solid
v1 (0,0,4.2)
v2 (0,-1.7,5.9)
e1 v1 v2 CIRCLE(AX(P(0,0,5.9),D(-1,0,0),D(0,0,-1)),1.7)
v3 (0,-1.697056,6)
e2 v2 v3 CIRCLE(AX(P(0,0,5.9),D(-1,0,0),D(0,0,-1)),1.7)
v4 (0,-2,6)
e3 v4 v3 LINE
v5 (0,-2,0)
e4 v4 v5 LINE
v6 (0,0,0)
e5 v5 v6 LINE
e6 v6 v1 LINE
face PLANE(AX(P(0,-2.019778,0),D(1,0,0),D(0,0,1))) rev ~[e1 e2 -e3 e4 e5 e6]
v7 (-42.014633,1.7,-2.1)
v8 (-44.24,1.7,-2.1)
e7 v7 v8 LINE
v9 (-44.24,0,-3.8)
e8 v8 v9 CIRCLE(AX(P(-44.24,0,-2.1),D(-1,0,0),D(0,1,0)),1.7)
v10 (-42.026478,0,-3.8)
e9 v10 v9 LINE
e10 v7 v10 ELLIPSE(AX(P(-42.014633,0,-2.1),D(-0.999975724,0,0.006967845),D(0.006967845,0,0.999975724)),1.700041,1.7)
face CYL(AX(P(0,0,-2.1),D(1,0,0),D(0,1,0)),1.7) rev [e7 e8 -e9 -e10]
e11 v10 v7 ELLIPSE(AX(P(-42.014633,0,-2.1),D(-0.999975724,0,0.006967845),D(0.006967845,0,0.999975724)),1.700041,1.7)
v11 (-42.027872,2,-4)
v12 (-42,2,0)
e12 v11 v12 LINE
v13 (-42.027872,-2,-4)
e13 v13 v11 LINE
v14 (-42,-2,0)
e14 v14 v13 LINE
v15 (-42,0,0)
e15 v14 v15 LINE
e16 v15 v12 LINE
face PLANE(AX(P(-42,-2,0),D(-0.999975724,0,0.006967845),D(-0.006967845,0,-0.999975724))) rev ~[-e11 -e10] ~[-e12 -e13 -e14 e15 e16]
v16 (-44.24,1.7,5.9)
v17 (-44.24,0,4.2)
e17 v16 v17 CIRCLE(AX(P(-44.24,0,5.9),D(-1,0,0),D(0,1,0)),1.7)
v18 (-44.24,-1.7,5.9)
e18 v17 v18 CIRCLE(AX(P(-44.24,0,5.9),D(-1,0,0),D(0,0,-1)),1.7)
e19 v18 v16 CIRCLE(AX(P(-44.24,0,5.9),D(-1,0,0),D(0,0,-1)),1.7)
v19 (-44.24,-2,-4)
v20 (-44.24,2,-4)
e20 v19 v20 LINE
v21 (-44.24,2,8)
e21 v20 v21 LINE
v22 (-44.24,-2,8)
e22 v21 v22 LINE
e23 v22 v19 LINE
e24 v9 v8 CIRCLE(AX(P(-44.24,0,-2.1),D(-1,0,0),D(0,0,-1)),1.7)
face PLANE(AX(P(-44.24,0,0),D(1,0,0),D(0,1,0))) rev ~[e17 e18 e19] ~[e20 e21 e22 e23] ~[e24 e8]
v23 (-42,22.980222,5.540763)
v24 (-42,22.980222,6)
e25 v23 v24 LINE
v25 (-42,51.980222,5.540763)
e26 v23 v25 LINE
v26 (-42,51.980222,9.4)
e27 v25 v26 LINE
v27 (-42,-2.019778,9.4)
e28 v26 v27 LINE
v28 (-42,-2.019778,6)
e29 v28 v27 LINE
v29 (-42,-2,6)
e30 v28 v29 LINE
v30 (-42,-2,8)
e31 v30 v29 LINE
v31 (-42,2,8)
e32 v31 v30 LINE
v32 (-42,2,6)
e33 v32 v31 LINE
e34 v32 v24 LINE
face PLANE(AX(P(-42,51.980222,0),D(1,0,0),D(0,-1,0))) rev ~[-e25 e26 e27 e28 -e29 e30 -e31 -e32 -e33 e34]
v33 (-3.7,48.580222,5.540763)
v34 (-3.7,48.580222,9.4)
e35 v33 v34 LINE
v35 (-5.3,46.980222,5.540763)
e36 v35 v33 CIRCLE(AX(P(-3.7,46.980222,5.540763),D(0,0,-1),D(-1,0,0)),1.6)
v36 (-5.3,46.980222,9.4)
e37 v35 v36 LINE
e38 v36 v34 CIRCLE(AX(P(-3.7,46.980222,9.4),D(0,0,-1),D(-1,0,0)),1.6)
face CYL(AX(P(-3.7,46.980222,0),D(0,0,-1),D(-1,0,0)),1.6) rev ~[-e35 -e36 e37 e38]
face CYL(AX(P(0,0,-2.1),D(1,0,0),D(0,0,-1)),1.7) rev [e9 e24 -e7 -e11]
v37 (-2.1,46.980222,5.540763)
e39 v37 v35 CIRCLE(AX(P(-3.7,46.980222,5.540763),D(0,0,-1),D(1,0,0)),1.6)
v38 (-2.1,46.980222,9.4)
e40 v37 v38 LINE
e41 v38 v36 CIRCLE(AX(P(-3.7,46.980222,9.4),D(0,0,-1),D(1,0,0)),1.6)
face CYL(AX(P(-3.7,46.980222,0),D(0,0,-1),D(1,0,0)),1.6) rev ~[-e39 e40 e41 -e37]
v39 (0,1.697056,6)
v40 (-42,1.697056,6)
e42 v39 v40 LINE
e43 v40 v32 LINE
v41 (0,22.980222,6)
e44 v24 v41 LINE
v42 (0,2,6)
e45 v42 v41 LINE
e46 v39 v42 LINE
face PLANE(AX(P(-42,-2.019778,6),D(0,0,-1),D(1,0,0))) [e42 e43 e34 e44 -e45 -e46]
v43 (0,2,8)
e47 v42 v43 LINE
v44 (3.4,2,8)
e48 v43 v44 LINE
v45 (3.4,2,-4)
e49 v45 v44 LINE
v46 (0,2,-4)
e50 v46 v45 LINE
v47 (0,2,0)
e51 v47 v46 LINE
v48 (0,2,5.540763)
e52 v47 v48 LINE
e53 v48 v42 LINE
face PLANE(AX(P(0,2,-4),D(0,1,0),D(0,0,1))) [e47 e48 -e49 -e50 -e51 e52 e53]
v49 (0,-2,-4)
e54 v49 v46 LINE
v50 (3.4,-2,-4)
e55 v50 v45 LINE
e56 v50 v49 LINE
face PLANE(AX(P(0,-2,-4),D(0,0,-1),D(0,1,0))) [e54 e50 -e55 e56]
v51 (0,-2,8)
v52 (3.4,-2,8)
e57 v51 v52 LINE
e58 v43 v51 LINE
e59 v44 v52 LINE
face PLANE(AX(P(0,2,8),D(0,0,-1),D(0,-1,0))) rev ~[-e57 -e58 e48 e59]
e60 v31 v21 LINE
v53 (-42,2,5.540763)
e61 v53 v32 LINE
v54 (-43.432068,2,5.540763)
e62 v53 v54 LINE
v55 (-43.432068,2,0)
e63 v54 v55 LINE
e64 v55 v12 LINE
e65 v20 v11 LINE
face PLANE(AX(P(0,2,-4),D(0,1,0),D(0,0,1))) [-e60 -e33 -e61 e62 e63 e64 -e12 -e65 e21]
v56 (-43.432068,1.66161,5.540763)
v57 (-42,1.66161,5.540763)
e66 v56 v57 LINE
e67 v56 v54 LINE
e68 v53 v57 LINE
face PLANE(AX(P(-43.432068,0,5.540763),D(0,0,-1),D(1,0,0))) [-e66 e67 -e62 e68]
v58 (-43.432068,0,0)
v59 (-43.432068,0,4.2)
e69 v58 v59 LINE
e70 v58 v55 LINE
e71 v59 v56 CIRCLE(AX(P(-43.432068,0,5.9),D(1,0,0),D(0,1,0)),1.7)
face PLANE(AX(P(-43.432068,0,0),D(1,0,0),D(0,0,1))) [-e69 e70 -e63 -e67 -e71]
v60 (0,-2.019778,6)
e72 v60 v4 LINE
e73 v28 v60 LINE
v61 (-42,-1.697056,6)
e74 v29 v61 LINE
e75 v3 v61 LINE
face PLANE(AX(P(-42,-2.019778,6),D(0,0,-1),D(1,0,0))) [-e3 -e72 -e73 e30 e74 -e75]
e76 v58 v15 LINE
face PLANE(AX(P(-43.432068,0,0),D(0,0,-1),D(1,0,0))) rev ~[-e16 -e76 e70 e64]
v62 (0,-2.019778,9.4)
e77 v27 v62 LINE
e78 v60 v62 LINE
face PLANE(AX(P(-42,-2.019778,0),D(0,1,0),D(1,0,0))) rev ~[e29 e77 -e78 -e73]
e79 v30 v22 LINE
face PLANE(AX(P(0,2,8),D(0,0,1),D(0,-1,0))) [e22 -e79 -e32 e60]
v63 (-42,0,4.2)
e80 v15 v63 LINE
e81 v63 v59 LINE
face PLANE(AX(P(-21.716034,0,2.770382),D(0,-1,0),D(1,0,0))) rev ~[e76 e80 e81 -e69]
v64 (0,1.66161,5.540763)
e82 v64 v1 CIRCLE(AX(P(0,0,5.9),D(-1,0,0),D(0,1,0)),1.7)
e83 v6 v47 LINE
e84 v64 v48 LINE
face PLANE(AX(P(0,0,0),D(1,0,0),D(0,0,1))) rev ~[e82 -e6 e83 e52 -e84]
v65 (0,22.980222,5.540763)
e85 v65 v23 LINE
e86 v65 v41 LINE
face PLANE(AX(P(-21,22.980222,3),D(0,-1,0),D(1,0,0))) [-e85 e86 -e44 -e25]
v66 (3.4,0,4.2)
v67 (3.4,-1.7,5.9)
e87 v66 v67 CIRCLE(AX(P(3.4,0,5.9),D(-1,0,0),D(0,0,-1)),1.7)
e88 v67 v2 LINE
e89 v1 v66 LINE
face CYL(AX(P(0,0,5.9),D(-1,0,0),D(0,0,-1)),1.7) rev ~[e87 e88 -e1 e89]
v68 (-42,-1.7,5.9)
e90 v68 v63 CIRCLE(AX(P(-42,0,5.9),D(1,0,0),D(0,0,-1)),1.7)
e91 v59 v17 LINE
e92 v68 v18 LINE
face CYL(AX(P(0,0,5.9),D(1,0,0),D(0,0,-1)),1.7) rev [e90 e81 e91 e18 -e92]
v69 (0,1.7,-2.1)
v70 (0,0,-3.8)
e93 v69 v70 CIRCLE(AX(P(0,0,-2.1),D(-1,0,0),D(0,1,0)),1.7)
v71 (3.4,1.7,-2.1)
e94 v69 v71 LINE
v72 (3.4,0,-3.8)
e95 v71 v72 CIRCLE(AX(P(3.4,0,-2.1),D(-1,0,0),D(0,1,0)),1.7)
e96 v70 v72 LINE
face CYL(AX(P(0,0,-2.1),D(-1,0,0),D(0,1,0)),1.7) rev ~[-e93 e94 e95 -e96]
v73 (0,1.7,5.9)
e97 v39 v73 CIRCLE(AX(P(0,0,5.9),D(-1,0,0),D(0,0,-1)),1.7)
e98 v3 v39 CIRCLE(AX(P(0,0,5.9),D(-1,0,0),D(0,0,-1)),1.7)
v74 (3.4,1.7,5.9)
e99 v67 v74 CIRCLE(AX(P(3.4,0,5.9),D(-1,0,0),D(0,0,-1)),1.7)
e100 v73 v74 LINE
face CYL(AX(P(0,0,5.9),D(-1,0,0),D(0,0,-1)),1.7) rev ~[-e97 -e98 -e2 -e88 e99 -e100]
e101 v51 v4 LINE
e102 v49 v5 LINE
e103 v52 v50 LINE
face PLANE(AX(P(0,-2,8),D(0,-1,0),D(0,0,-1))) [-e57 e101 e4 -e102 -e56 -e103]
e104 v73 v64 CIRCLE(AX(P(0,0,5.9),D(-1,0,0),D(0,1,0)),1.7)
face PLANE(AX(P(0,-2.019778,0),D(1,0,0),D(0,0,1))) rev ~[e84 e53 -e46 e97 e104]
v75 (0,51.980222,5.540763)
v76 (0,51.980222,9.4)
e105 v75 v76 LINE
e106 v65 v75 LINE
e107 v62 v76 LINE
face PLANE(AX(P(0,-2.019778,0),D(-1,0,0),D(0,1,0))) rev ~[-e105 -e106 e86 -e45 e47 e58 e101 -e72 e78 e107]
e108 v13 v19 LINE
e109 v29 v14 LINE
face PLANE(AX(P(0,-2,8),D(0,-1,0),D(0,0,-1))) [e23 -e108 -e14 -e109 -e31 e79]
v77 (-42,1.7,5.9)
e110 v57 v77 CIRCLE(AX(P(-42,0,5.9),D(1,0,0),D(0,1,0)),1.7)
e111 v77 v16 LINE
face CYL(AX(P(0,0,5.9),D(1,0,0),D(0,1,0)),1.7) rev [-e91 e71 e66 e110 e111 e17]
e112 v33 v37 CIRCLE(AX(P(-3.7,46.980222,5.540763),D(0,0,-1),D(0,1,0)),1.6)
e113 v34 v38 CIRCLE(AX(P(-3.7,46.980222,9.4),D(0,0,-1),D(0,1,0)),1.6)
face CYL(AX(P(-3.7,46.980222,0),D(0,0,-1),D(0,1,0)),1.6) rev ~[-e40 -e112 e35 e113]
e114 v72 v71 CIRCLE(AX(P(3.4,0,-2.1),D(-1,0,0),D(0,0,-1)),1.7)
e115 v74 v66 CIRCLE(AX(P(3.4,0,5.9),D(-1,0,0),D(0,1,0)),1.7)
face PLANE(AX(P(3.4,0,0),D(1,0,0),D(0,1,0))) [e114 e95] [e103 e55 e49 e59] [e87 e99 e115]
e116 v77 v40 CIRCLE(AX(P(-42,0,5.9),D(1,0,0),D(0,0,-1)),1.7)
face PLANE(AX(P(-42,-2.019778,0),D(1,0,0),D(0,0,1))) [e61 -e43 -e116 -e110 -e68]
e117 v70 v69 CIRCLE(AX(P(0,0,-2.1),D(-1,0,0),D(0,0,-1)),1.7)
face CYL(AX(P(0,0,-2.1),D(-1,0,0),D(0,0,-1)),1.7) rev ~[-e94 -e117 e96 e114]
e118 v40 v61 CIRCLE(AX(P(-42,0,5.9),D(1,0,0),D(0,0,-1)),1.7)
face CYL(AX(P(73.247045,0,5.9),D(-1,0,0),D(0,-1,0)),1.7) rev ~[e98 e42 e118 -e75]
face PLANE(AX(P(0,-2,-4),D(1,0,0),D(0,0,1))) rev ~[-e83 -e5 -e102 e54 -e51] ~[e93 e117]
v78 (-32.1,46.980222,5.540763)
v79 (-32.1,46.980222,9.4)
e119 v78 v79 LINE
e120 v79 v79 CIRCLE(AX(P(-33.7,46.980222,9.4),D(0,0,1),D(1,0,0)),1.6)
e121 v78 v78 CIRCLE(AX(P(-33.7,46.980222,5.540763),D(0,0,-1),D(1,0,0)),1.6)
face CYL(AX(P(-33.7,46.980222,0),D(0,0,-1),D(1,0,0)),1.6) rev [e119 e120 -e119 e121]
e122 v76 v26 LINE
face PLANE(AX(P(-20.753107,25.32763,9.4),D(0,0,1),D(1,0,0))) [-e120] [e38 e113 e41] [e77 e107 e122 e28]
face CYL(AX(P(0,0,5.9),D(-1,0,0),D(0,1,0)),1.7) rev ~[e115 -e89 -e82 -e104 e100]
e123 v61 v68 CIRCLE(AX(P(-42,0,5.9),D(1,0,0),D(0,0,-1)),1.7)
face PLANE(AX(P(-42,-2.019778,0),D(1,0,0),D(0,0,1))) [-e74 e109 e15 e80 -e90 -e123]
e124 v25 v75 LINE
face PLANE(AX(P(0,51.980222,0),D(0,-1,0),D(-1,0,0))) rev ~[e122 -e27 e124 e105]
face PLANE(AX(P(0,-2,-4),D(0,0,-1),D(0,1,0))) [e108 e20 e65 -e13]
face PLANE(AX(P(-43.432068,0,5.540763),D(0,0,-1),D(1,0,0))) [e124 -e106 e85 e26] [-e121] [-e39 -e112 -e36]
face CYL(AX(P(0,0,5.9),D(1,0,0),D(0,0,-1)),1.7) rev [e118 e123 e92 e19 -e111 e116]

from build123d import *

# Parameters (mm, degrees)
F1_DEPTH  = 3.4
F2_R      = 1.6
F2_W      = 2
F2_H      = 5
F3_DEPTH  = 9.4
F4_DEPTH  = 44.24
F5_W      = 43.4320680797
F5_H      = 5.540763028
F6_DEPTH  = 55
F7_W      = 42
F7_H      = 6
F8_DEPTH  = 25
F9_D      = 3.4
F11_DEPTH = 25


# Not quite as in the source:
# - after a boolean that leaves OpenCascade's solid faulty, fix() repairs it
# - a feature names something its author has since deleted; it is built from what else it names


with BuildPart() as f1:
    # F0 (on Right) → F1 (new body)
    with BuildSketch(Plane.YZ):
        Polygon((0, 4), (-2, 4), (-2, -4), (0, -4), (2, -4), (2, 4), align=None)
        with BuildLine():
            ThreePointArc((1.7, -2.1), (1.202081528, -3.302081528), (0, -3.8))
            ThreePointArc((0, -3.8), (-1.202081528, -0.897918472), (1.7, -2.1))
        make_face(mode=Mode.SUBTRACT)
        Polygon((-2, 8), (-2, 4), (0, 4), (2, 4), (2, 8), align=None)
        with BuildLine():
            ThreePointArc((1.7, 5.9), (1.202081528, 4.697918472), (0, 4.2))
            ThreePointArc((0, 4.2), (-1.202081528, 7.102081528), (1.7, 5.9))
        make_face(mode=Mode.SUBTRACT)
    extrude(amount=F1_DEPTH)

    # F2 (on Top) → F3 (join)
    with BuildSketch(Plane.XY):
        with BuildLine():
            Line((-42, -2.019777894), (0, -2.019777894))
            Line((0, -2.019777894), (0, 1.980222106))
            Line((0, 1.980222106), (0, 46.980222106))
            Line((0, 46.980222106), (-2, 46.980222106))
            Line((-2, 46.980222106), (-2.1, 46.980222106))
            ThreePointArc((-2.1, 46.980222106), (-3.7, 45.380222106), (-5.3, 46.980222106))
            ThreePointArc((-5.3, 46.980222106), (-4.8313708499, 48.1115929559), (-3.7, 48.580222106))
            Line((-3.7, 48.580222106), (-3.7, 51.980222106))
            Line((-3.7, 51.980222106), (-42, 51.980222106))
            Line((-42, 51.980222106), (-42, 1.980222106))
            Line((-42, 1.980222106), (-42, -2.019777894))
        make_face()
        with Locations((-33.7, 46.980222106)):
            Circle(F2_R, mode=Mode.SUBTRACT)
        with BuildLine():
            Line((-2.1, 46.980222106), (-2, 46.980222106))
            Line((-2, 46.980222106), (-2, 51.980222106))
            Line((-2, 51.980222106), (-3.7, 51.980222106))
            Line((-3.7, 51.980222106), (-3.7, 48.580222106))
            ThreePointArc((-3.7, 48.580222106), (-2.5686291501, 48.1115929559), (-2.1, 46.980222106))
        make_face()
        with Locations((-1, 49.480222106)):
            Rectangle(F2_W, F2_H)
    extrude(amount=F3_DEPTH)

    # F0 (on Right) → F4 (join)
    with BuildSketch(Plane.YZ):
        Polygon((0, 4), (-2, 4), (-2, -4), (0, -4), (2, -4), (2, 4), align=None)
        with BuildLine():
            ThreePointArc((1.7, -2.1), (1.202081528, -3.302081528), (0, -3.8))
            ThreePointArc((0, -3.8), (-1.202081528, -0.897918472), (1.7, -2.1))
        make_face(mode=Mode.SUBTRACT)
        Polygon((-2, 8), (-2, 4), (0, 4), (2, 4), (2, 8), align=None)
        with BuildLine():
            ThreePointArc((1.7, 5.9), (1.202081528, 4.697918472), (0, 4.2))
            ThreePointArc((0, 4.2), (-1.202081528, 7.102081528), (1.7, 5.9))
        make_face(mode=Mode.SUBTRACT)
    extrude(amount=-F4_DEPTH)

    # F5 (on Front) → F6 (cut)
    with BuildSketch(Plane.XZ):
        with Locations((-21.7160340399, 2.770381514)):
            Rectangle(F5_W, F5_H)
    extrude(amount=-F6_DEPTH, mode=Mode.SUBTRACT)

    # F7 (on face) → F8 (cut)
    with BuildSketch(Plane.XZ.offset(2.019777894)):
        with Locations((-21, 3)):
            Rectangle(F7_W, F7_H)
    extrude(amount=-F8_DEPTH, mode=Mode.SUBTRACT)

    # F9 (through all)
    with Locations(Plane.YZ):
        with Locations((0, 5.9)):
            Hole(F9_D / 2)

    # F10 (on face) → F11 (cut)
    with BuildSketch(Plane.XZ.offset(2)):
        Polygon((0, -4), (0, 0), (-42, 0), (-42.0278720558, -4), align=None)
    extrude(amount=-F11_DEPTH, mode=Mode.SUBTRACT)

    add(f1.part.fix(), mode=Mode.REPLACE)


solid = f1.part
